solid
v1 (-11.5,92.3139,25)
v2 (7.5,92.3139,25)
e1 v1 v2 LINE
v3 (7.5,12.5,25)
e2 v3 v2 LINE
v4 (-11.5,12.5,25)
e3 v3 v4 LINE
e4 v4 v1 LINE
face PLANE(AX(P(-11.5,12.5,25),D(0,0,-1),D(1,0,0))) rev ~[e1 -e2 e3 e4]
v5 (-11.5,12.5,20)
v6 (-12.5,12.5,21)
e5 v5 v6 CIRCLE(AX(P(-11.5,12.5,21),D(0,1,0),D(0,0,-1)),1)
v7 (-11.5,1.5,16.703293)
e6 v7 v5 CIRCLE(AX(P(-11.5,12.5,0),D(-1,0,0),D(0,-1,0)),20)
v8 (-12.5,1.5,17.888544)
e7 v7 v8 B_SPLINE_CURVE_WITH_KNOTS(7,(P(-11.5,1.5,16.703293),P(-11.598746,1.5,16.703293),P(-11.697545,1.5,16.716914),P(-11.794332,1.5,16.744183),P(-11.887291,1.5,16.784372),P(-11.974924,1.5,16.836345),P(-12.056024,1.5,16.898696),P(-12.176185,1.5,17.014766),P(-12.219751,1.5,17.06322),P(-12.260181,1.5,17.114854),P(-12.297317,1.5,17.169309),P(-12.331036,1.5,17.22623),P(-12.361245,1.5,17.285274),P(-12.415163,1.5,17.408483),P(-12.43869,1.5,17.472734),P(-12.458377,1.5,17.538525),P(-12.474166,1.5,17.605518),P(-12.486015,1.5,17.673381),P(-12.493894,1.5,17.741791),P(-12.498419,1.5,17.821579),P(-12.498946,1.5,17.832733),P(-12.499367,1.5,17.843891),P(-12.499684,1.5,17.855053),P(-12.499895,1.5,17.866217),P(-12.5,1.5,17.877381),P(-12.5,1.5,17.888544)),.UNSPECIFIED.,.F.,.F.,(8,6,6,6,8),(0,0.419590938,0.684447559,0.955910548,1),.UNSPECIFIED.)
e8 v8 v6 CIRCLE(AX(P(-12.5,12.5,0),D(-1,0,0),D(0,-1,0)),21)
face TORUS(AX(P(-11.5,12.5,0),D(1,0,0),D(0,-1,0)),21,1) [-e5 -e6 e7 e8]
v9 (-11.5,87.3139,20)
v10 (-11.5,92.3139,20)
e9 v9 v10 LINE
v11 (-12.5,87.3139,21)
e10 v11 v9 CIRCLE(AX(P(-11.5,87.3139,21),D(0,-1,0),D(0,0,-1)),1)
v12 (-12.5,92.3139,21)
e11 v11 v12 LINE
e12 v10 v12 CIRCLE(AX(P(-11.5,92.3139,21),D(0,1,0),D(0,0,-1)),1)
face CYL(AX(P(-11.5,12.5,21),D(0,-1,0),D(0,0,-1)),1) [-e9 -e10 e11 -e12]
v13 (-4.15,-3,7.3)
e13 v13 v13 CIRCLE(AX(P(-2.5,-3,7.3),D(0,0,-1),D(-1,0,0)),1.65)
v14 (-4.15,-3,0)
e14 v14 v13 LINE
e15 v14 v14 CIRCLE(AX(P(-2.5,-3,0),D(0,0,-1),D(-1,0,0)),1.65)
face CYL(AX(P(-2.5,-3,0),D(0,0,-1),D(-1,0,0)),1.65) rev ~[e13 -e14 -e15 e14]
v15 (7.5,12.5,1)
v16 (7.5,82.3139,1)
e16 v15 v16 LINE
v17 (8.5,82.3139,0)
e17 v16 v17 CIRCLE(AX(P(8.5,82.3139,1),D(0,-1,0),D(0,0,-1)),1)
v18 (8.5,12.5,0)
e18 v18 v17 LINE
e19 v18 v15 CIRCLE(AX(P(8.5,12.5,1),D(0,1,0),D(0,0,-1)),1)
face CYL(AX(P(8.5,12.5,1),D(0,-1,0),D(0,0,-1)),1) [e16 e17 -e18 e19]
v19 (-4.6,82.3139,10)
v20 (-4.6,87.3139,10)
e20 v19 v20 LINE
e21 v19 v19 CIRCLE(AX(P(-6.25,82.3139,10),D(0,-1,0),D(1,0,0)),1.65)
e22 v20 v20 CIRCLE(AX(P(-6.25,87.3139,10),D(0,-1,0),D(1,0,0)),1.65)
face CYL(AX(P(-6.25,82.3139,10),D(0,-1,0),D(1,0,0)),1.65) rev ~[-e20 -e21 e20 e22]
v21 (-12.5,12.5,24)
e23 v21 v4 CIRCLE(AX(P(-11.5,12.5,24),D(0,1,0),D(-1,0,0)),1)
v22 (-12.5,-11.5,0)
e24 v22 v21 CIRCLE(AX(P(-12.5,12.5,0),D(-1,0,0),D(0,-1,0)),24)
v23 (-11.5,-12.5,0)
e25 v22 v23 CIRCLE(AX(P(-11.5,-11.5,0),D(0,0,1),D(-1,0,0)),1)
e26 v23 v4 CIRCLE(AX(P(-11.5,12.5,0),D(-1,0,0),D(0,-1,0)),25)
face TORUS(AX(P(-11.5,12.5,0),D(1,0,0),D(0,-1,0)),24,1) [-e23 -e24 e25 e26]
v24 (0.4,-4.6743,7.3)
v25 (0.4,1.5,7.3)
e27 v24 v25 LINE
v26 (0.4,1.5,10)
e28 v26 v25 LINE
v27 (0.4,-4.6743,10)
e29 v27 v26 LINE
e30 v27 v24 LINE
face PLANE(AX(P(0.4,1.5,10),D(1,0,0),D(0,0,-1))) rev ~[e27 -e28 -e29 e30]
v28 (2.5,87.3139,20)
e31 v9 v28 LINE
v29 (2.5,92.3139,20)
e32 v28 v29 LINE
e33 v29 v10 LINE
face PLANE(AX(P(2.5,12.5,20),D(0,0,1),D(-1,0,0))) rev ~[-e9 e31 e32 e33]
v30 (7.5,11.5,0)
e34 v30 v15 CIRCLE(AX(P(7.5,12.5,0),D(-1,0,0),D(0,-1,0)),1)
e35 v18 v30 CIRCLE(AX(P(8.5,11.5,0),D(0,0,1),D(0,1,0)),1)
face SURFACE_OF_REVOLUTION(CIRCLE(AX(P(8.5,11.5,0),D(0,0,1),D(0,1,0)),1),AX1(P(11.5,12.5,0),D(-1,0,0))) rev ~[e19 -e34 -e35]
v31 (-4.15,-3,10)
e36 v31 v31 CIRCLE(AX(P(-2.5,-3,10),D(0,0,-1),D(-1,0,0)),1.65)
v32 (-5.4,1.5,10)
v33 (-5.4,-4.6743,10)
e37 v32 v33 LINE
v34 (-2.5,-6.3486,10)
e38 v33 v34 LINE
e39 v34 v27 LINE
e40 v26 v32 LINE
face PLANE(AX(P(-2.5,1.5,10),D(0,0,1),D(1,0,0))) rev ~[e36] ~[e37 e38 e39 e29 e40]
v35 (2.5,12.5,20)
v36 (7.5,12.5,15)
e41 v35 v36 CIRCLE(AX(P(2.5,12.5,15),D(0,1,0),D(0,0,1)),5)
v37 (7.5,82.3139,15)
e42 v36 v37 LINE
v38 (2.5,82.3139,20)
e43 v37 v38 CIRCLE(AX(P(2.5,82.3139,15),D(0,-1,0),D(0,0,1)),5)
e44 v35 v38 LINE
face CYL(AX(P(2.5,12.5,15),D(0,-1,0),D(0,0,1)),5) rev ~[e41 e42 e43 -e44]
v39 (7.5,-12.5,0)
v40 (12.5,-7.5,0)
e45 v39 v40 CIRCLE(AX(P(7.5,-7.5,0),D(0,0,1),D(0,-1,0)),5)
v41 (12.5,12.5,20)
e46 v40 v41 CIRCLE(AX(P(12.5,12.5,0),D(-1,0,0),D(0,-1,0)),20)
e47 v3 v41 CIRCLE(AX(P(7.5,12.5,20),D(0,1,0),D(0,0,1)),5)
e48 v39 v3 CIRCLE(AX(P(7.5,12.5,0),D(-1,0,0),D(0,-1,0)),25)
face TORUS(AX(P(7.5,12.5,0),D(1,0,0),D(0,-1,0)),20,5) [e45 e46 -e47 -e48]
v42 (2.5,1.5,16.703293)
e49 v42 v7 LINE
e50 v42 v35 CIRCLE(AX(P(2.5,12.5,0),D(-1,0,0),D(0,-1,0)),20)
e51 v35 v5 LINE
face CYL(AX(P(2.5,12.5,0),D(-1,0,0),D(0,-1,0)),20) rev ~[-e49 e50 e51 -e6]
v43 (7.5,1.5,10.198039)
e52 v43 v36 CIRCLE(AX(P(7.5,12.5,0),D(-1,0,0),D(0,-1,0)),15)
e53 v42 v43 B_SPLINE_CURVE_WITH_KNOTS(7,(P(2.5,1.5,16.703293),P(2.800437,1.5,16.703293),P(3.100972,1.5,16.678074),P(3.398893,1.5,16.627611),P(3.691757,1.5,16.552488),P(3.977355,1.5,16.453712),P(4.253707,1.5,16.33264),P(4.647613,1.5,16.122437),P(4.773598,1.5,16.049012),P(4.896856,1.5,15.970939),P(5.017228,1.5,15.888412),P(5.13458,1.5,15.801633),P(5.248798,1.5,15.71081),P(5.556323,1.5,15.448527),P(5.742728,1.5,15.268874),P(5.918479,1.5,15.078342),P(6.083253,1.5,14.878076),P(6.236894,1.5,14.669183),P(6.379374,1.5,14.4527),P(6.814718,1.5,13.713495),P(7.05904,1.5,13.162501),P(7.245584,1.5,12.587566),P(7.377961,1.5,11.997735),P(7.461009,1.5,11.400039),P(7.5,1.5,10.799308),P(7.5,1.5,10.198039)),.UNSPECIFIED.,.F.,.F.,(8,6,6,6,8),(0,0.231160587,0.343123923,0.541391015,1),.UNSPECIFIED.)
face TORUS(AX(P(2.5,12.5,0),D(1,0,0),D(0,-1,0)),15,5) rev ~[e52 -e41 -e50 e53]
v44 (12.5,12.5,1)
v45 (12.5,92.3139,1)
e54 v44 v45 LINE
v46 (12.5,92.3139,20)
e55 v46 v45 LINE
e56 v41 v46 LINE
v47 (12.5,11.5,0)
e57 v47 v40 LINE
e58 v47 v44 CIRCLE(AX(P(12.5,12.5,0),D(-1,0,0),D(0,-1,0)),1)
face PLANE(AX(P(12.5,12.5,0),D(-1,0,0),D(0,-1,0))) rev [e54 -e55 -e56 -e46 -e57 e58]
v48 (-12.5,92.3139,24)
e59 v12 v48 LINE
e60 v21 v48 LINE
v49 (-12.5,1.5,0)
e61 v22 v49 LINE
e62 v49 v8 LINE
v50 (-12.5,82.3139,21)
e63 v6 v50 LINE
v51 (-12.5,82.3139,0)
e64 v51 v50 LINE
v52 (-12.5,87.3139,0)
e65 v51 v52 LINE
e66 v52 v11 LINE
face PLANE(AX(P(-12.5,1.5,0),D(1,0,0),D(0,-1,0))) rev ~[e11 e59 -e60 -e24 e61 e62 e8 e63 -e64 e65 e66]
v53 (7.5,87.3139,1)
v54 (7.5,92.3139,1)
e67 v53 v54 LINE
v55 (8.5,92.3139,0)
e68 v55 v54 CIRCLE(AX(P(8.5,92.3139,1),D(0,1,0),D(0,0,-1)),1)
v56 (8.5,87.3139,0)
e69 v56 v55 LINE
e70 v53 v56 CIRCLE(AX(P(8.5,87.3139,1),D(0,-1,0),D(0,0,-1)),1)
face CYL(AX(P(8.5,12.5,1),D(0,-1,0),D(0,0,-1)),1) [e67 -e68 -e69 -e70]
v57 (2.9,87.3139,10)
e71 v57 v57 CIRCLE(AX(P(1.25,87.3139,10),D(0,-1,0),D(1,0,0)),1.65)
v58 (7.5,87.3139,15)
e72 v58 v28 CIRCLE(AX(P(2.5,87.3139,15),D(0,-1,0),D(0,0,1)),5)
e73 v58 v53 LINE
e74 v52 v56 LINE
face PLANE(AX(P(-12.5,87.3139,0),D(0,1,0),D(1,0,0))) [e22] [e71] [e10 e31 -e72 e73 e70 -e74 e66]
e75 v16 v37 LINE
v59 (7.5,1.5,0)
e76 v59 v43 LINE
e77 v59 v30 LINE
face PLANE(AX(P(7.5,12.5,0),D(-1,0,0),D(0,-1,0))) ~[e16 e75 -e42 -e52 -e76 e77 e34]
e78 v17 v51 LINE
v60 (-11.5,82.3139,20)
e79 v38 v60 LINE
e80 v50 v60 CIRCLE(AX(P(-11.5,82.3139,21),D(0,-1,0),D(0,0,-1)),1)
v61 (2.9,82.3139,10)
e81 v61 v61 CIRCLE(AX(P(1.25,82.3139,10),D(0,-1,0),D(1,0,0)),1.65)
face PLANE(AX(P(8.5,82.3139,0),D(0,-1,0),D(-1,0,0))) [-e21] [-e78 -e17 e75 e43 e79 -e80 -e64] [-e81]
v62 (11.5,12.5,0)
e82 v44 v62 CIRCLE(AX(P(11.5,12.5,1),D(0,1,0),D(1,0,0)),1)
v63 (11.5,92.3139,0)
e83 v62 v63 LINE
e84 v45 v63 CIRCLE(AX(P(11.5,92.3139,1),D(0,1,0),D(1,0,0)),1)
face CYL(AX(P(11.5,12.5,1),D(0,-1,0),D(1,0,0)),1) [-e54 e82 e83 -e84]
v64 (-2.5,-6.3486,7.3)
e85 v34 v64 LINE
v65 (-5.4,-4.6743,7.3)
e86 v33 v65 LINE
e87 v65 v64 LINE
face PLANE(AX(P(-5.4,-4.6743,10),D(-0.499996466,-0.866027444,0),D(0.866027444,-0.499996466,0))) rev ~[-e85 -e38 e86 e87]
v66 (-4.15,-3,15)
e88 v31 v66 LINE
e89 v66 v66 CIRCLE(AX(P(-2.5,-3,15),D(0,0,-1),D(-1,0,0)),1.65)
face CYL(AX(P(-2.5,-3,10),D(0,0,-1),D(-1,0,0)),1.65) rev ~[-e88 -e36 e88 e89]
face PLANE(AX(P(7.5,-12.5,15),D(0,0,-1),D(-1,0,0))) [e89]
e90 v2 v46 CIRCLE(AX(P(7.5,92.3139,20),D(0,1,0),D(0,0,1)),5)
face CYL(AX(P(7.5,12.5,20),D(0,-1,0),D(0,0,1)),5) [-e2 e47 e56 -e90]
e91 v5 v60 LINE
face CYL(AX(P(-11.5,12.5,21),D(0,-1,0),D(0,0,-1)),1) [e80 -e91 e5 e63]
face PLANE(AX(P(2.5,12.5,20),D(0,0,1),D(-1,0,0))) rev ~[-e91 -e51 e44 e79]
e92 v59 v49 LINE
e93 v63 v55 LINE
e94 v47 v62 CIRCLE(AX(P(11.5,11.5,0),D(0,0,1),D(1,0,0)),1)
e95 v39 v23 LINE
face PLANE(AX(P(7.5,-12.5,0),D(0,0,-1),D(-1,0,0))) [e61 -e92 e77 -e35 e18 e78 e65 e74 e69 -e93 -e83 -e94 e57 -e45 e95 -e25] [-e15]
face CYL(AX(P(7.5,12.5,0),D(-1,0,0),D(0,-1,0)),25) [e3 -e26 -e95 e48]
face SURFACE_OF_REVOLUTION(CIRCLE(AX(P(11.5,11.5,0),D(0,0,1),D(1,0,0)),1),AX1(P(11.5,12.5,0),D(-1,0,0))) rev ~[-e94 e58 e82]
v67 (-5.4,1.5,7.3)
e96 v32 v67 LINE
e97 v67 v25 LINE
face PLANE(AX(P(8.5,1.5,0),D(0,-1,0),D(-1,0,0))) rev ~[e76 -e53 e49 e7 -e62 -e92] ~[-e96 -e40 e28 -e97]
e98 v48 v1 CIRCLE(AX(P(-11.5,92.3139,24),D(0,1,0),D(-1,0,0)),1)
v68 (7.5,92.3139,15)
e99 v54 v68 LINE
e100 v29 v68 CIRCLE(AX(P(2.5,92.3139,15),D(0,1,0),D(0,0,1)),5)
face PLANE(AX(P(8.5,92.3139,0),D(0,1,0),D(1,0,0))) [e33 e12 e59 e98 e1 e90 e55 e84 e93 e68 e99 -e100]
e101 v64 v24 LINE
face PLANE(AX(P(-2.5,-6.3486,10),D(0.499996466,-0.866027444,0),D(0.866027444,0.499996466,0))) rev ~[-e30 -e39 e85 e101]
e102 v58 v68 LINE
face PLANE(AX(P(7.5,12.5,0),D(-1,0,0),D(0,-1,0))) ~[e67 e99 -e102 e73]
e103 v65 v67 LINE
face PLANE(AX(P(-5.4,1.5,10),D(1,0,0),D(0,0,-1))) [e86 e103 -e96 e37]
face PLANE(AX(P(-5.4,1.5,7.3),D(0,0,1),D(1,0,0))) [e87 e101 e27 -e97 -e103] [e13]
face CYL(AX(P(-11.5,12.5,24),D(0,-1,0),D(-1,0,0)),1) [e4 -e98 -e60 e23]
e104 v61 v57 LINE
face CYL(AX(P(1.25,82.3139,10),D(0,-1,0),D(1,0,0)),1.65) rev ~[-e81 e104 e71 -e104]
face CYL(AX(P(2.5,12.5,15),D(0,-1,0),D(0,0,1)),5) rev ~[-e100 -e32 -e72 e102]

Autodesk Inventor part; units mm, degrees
ref_plane "YZ Plane" through (0, 0, 0) normal (1, 0, 0) x (0, 1, 0)
ref_plane "XZ Plane" through (0, 0, 0) normal (0, 1, 0) x (-1, 0, 0)
ref_plane "XY Plane" through (0, 0, 0) normal (0, 0, 1) x (1, 0, 0)
ref_plane "Work Plane1" through (0, 0, 0) normal (0, 0, 1) x (1, 0, 0)
sketch "Sketch1" plane through (0, 0, 0) normal (0, 0, 1) x (1, 0, 0)
  arc A0 (12.5, 11.5) -> (11.5, 12.5) centre (11.5, 11.5) ccw projected
  line L0 (8.5, 12.5) -> (11.5, 12.5) projected
  arc A1 (8.5, 12.5) -> (7.5, 11.5) centre (8.5, 11.5) ccw projected
  line L1 (7.5, 1.5) -> (7.5, 11.5) projected
  arc A2 (-12.5, -11.5) -> (-11.5, -12.5) centre (-11.5, -11.5) ccw projected
  line L2 (7.5, -12.5) -> (-11.5, -12.5) projected
  arc A3 (7.5, -12.5) -> (12.5, -7.5) centre (7.5, -7.5) ccw projected
  line L3 (12.5, 11.5) -> (12.5, -7.5) projected
  arc A4 (-11.5, 1.5) -> (-12.5, 0.5) centre (-11.5, 0.5) ccw projected
  line L4 (-12.5, 0.5) -> (-12.5, -11.5) projected
  line L5 (7.5, 1.5) -> (-11.5, 1.5) projected
  circle A5 centre (-2.5, -3) radius 1.65 projected
  arc A6 (12.5, 11.5) -> (11.5, 12.5) centre (11.5, 11.5) ccw projected
  line L6 (12.5, -7.5) -> (12.5, 11.5) projected
  arc A7 (7.5, -12.5) -> (12.5, -7.5) centre (7.5, -7.5) ccw projected
  line L7 (1.0011, -12.5) -> (7.5, -12.5) projected
  line L8 (-6.0011, -12.5) -> (1.0011, -12.5) projected
  line L9 (-11.5, -12.5) -> (-6.0011, -12.5) projected
  arc A8 (-12.5, -11.5) -> (-11.5, -12.5) centre (-11.5, -11.5) ccw projected
  line L10 (-12.5, -8.5) -> (-12.5, -11.5) projected
  arc A9 (-11.5, -7.5) -> (-12.5, -8.5) centre (-11.5, -8.5) ccw projected
  line L11 (2.5, -7.5) -> (-11.5, -7.5) projected
  arc A10 (2.5, -7.5) -> (7.5, -2.5) centre (2.5, -2.5) ccw projected
  line L12 (7.5, 11.5) -> (7.5, -2.5) projected
  arc A11 (8.5, 12.5) -> (7.5, 11.5) centre (8.5, 11.5) ccw projected
  line L13 (8.5, 12.5) -> (11.5, 12.5) projected
revolve "Revolution1" add sketch "Sketch1" angle 90 about axis through (8.5, 12.5, 0) along (-1, 0, 0) contours L3 A3 L2 A2 L4 A9 L11 A10 L12 L1 A1 L0 A0
sketch "Sketch2" plane through (8.5, 12.5, 0) normal (0, 1, 0) x (1, 0, 0)
  line L0 (4, -20) -> (4, -1) projected
  arc A0 (4, -1) -> (3, 0) centre (3, -1) ccw projected
  line L1 (3, 0) -> (0, 0) projected
  arc A1 (0, 0) -> (-1, -1) centre (0, -1) ccw projected
  line L2 (-1, -1) -> (-1, -15) projected
  arc A2 (-21, -24) -> (-20, -25) centre (-20, -24) ccw projected
  line L3 (-20, -25) -> (-1, -25) projected
  arc A3 (-1, -25) -> (4, -20) centre (-1, -20) ccw projected
  line L4 (-21, -21) -> (-21, -24) projected
  line L5 (-6, -20) -> (-20, -20) projected
  arc A4 (-20, -20) -> (-21, -21) centre (-20, -21) ccw projected
  arc A5 (-6, -20) -> (-1, -15) centre (-6, -15) ccw projected
  point P0 (-8.5, 0)
extrude "Extrusion1" add sketch "Sketch2" along normal up to surface (79.8139 mm away)
sketch "Sketch5" plane through (7.5, -12.5, 0) normal (0, 0, -1) x (-1, 0, 0)
  line L0 (20, 99.8139) -> (-1, 99.8139)
  line L1 (-1, 99.8139) -> (-1, 94.8139)
  line L2 (-1, 94.8139) -> (20, 94.8139)
  line L3 (20, 94.8139) -> (20, 99.8139)
  line L4 (20, 25) -> (20, 104.8139) projected
  line L5 (19, 104.8139) -> (5, 104.8139) projected
  point P0 (7.5, 12.5)
  point P1 (-1, 104.8139)
  dimension "d10" = 5
  dimension "d11" = 5
extrude "Extrusion4" add sketch "Sketch5" against normal up to next
sketch "Sketch6" plane through (-12.5, 82.3139, 0) normal (0, -1, 0) x (1, 0, 0)
  circle A0 centre (13.75, 10) radius 1.65
  circle A1 centre (6.25, 10) radius 1.65
  line L0 (13.75, 10) -> (6.25, 10) construction
  line L1 (20, 15) -> (20, 1) projected
  line L2 (20, 2.0913) -> (0, 2.0913) construction
  line L3 (21, 0) -> (0, 0) projected
  line L4 (10, 0) -> (10, 20) construction
  line L5 (1, 20) -> (15, 20) projected
  line L6 (0, 0) -> (0, 21) projected
  point P0 (12.5, 0)
  point P1 (10, 2.0913)
  point P2 (10, 10)
  point P3 (20, 11)
  point P4 (0, 12)
  dimension "d14" = 7.5
  dimension "d15" = 3.3
extrude "Extrusion5" cut sketch "Sketch6" against normal through all
sketch "Sketch8" plane through (7.5, -12.5, 0) normal (0, 0, -1) x (-1, 0, 0)
  arc A0 (20, 4) -> (19, 5) centre (19, 4) ccw projected
  line L0 (-1, 25) -> (-1, 94.8139) projected
  line L1 (20, 4) -> (-1, 4)
  line L2 (-1, 4) -> (-1, 14)
  line L3 (-1, 14) -> (20, 14)
  line L4 (20, 14) -> (20, 4)
  point P0 (7.5, 12.5)
  dimension "d18" = 10
extrude "Extrusion6" add sketch "Sketch8" against normal up to next
sketch "Sketch9" plane through (7.5, -12.5, 0) normal (0, 0, -1) x (-1, 0, 0)
  circle A0 centre (10, 9.5) radius 1.65
  arc A1 (-4, 25) -> (-5, 24) centre (-4, 24) ccw projected
  line L0 (-1, 25) -> (-4, 25) projected
  arc A2 (0, 24) -> (-1, 25) centre (-1, 24) ccw projected
  line L1 (0, 14) -> (0, 24) projected
  arc A3 (19, 0) -> (20, 1) centre (19, 1) ccw projected
  line L2 (0, 0) -> (19, 0) projected
  arc A4 (-5, 5) -> (0, 0) centre (0, 5) ccw projected
  line L3 (-5, 24) -> (-5, 5) projected
  line L4 (20, 1) -> (20, 14) projected
  line L5 (20, 9.5) -> (0, 9.5) construction
  line L6 (10, 5) -> (10, 14) construction
  line L7 (20, 14) -> (0, 14) projected
  arc A5 (20, 13) -> (19, 14) centre (19, 13) ccw projected
  line L8 (20, 13) -> (20, 1) projected
  line L9 (0, 14) -> (19, 14) projected
  circle A6 centre (10, 9.5) radius 1.65 projected
  point P0 (7.5, 12.5)
  point P1 (20, 4)
  point P2 (10, 9.5)
  dimension "d21" = 3.3
extrude "Extrusion7" cut sketch "Sketch9" against normal blind 10 contours A0
sketch "Sketch11" plane through (-2.5, -3, 10) normal (0, 0, -1) x (-1, 0, 0)
  line L0 (0, -3.3486) -> (-2.9, -1.6743)
  line L1 (-2.9, -1.6743) -> (-2.9, 1.6743)
  line L2 (-2.9, 1.6743) -> (0, 3.3486)
  line L3 (0, 3.3486) -> (2.9, 1.6743)
  line L4 (2.9, 1.6743) -> (2.9, -1.6743)
  line L5 (2.9, -1.6743) -> (0, -3.3486)
  line L6 (0, 6.2514) -> (0, -6.2514) construction
  circle A0 centre (0, 0) radius 1.65 construction
  circle A1 centre (0, 0) radius 1.65
  point P0 (-2.5, 3)
  dimension "d27" = 9.6
  dimension "d28" = 5.8
extrude "Extrusion8" cut sketch "Sketch11" along normal blind 2.7
sketch "Sketch12" plane through (-12.5, 1.5, 0) normal (0, 1, 0) x (1, 0, 0)
  line L0 (7.1, -10) -> (10, -10) projected
  line L1 (10, -10) -> (12.9, -10) projected
  line L2 (12.9, -10) -> (10, -10) projected
  line L3 (10, -10) -> (7.1, -10) projected
  line L4 (7.1, -10) -> (7.1, -7.3)
  line L5 (7.1, -10) -> (7.1, -7.3) projected
  line L6 (7.1, -7.3) -> (12.9, -7.3)
  line L7 (12.9, -10) -> (12.9, -7.3) projected
  line L8 (12.9, -7.3) -> (12.9, -10)
  point P0 (12.5, 0)
  dimension "d31" = 2.7
extrude "Extrusion9" cut sketch "Sketch12" against normal up to next
sketch "Sketch13" plane through (7.5, -12.5, 10) normal (0, 0, -1) x (-1, 0, 0)
  circle A0 centre (10, 9.5) radius 1.65 projected
  circle A1 centre (10, 9.5) radius 1.65
  point P0 (7.5, 12.5)
extrude "Extrusion10" cut sketch "Sketch13" against normal blind 5
properties part number "frame-foot"
